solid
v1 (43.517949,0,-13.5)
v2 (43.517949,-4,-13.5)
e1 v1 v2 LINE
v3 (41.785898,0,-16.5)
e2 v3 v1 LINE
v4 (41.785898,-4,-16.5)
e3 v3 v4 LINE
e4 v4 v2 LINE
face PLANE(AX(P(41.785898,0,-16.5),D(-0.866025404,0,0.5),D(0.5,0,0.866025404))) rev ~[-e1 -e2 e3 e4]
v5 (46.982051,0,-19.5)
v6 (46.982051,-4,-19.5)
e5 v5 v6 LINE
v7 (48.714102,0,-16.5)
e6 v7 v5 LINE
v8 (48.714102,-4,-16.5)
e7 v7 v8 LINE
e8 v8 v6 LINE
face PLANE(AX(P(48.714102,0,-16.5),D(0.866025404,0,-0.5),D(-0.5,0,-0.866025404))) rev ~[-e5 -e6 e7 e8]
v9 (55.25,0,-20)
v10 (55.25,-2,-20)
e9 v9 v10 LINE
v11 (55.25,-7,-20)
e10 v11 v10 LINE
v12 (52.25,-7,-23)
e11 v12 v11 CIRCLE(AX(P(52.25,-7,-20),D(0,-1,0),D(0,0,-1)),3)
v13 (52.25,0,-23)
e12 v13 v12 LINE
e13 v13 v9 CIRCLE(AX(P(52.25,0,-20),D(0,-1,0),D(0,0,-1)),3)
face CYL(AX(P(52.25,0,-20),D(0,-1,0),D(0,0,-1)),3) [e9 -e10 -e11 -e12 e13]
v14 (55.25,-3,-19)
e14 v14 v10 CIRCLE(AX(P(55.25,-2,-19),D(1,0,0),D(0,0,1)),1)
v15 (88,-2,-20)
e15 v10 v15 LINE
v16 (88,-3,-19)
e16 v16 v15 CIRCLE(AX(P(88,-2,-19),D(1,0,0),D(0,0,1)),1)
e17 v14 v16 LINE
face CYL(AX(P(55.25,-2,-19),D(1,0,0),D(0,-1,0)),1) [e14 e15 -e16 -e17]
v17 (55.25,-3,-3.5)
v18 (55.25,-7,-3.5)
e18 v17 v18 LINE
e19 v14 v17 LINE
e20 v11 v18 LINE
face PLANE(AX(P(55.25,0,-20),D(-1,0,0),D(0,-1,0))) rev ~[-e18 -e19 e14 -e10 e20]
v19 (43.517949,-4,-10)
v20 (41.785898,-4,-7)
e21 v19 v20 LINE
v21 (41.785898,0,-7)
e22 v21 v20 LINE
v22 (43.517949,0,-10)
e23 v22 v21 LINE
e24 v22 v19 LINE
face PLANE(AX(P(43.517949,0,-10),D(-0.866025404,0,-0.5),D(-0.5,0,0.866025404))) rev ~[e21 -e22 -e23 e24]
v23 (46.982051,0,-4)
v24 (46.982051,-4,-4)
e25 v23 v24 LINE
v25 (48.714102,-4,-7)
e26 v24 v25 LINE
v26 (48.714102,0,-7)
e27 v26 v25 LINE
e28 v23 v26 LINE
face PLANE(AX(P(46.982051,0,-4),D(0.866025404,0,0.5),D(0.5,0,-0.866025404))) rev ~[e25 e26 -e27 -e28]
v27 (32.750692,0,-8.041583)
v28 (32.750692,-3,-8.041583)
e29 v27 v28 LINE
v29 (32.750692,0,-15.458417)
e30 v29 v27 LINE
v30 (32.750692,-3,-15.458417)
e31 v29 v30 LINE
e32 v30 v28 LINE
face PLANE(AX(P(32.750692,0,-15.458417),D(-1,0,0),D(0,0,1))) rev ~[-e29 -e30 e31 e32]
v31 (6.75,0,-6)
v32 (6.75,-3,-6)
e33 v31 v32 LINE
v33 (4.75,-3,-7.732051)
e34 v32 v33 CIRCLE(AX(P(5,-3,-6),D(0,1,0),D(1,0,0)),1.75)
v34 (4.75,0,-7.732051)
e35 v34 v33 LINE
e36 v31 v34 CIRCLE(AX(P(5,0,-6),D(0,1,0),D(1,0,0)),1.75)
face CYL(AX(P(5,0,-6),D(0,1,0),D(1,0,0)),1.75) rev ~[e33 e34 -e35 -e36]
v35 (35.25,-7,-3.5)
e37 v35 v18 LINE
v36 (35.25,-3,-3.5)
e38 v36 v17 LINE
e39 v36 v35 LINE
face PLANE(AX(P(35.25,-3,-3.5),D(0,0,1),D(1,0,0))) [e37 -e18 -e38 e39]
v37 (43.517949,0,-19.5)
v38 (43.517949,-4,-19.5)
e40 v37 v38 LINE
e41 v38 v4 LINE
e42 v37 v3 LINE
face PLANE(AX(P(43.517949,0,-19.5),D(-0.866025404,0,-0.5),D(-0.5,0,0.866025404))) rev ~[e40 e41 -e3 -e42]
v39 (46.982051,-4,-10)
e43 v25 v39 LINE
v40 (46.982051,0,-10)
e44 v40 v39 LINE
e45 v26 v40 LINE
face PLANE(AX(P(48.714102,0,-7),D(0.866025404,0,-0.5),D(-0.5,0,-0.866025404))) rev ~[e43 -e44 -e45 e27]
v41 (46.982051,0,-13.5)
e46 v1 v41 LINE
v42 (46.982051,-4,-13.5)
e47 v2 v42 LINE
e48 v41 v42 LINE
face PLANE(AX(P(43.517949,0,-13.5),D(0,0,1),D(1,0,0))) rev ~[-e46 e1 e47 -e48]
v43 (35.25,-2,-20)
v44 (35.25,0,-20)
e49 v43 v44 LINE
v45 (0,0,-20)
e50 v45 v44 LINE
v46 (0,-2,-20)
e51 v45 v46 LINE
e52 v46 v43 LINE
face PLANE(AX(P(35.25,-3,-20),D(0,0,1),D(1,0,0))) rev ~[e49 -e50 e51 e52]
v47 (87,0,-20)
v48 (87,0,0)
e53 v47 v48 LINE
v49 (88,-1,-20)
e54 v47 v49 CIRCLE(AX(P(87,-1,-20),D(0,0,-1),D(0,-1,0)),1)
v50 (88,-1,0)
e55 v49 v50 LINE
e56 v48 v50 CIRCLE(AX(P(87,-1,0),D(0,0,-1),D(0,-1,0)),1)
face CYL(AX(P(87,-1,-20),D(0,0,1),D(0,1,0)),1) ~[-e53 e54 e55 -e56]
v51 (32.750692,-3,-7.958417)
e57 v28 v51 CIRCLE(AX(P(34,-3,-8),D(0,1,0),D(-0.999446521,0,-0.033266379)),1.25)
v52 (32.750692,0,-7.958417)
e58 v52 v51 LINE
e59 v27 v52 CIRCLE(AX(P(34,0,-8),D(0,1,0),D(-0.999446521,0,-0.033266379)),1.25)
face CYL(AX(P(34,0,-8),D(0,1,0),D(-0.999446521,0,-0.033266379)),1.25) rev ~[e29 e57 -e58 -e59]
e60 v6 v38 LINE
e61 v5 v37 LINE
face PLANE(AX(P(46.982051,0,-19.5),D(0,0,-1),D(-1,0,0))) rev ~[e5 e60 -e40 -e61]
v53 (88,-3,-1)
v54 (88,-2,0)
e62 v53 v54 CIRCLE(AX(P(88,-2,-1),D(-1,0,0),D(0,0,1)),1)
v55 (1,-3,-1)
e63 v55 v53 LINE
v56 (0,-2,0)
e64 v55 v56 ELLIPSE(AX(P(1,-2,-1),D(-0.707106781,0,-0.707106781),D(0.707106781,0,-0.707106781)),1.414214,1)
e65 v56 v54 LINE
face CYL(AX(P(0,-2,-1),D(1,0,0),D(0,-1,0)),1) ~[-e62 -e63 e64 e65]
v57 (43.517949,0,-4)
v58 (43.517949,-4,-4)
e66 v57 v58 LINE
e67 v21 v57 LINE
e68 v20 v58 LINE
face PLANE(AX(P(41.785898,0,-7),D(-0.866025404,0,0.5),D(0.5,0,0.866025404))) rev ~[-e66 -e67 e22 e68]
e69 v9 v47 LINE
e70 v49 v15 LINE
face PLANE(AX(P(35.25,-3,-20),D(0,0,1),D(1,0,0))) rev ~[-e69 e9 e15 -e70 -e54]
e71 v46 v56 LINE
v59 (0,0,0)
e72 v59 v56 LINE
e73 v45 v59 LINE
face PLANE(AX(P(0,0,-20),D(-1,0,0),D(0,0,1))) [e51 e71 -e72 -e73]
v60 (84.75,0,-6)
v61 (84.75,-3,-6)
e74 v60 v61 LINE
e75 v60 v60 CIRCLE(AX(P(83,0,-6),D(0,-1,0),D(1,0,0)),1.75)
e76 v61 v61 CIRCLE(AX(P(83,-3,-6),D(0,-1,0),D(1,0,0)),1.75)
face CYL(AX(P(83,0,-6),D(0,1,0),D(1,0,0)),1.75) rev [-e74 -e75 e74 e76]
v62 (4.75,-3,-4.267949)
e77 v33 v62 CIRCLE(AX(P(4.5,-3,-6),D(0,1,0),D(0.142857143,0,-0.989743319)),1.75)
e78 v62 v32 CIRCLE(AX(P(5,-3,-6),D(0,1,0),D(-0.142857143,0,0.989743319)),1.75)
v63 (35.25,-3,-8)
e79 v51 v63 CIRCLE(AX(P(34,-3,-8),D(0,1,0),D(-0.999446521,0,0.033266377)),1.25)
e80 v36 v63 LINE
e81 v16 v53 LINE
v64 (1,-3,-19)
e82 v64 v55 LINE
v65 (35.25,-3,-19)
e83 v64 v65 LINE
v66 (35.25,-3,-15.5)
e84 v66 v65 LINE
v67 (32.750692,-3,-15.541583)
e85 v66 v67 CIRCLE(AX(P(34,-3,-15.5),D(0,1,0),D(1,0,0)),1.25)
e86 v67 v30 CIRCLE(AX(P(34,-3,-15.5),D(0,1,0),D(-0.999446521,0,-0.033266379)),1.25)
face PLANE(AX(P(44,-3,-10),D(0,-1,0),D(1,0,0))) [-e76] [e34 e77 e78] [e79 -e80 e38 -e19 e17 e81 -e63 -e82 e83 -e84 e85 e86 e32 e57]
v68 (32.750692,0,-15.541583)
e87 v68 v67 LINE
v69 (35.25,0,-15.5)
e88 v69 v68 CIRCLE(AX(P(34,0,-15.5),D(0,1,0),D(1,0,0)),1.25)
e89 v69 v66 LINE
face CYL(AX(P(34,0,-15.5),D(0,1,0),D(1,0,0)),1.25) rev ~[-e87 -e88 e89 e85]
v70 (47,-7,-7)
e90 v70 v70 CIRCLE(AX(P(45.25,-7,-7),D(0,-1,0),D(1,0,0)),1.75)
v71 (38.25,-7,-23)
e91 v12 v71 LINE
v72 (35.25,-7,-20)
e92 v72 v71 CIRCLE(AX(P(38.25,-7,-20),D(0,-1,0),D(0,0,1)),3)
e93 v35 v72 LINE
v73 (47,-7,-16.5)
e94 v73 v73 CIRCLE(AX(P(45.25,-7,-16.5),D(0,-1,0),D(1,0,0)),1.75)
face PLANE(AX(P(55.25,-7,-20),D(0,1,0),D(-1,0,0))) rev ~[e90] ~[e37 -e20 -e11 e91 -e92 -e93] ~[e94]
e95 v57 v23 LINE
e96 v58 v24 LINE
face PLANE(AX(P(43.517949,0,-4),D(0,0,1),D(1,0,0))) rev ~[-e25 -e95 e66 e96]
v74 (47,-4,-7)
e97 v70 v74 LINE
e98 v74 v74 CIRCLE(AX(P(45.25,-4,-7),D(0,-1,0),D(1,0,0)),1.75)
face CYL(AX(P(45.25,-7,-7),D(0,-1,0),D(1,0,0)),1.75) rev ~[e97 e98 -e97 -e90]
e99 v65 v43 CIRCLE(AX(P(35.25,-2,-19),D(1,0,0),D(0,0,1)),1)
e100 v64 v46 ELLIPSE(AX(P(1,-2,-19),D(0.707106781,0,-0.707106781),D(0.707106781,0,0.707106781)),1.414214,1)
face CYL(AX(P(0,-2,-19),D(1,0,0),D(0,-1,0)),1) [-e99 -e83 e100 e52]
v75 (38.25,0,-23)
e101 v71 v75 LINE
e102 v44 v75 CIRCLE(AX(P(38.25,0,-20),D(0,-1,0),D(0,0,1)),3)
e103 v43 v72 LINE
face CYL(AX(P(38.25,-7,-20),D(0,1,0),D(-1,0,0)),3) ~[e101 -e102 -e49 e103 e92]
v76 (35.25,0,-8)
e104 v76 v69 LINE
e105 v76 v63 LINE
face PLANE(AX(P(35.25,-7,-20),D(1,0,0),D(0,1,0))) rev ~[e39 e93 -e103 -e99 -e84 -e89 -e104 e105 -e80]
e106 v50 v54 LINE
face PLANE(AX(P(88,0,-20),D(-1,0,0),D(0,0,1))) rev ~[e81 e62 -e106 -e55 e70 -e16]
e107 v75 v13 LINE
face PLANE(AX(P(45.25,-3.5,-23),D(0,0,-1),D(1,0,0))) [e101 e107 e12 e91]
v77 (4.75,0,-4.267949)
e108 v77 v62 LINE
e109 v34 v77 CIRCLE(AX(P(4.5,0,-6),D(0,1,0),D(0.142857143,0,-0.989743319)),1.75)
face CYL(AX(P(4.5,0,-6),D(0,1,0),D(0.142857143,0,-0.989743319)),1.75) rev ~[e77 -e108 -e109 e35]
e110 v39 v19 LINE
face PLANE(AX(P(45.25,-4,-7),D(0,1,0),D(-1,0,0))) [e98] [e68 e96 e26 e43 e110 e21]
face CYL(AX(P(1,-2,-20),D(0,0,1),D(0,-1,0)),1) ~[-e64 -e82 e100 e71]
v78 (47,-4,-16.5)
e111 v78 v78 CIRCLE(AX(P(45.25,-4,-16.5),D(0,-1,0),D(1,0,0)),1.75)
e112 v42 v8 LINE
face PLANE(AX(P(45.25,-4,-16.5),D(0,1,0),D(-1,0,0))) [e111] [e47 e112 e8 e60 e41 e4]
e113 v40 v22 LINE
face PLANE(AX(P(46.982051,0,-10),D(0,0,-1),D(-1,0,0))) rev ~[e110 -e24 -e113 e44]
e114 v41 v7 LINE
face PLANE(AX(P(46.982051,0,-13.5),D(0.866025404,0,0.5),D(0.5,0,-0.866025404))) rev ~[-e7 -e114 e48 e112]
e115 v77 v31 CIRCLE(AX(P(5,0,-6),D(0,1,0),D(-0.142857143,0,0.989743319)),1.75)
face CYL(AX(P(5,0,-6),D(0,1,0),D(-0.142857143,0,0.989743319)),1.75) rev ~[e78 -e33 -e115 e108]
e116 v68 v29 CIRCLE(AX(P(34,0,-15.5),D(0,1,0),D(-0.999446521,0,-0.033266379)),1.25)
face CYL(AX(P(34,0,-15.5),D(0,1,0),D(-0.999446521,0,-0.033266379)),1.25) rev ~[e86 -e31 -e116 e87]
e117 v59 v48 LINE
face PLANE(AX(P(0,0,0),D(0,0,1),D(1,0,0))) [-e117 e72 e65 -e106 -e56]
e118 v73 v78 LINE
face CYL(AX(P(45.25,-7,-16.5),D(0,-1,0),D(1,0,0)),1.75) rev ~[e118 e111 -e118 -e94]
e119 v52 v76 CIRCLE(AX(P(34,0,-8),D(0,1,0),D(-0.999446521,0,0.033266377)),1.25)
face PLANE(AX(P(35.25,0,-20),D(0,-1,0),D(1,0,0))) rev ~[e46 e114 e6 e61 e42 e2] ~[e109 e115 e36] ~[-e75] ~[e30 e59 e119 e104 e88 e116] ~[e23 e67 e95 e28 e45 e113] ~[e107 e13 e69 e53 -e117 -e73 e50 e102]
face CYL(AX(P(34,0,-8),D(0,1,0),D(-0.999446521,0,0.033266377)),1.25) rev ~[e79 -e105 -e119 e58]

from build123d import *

# Parameters (mm, degrees)
F0_W     = 88
F0_H     = 20
F0_R     = 1.75
F1_DEPTH = 3
F2_W     = 20
F2_H     = 4.5
F2_H_2   = 7.5
F3_DEPTH = 4
F6_DEPTH = 4
F4_R     = 1.75
F7_DEPTH = 25
F9_DEPTH = 3
F10_R    = 3
F11_R    = 1


# Not quite as in the source:
# - a feature names something its author has since deleted; it is built from what else it names


with BuildPart() as f1:
    # F0 (on Front) → F1 (new body)
    with BuildSketch(Plane.XZ):
        with Locations((44, -10)):
            Rectangle(F0_W, F0_H)
        with BuildLine():
            ThreePointArc((35.25, -15.5), (34.0207943633, -16.7498270258), (32.7506918489, -15.5415829716))
            ThreePointArc((32.7506918489, -15.5415829716), (32.75, -15.5), (32.7506918489, -15.4584170284))
            Line((32.7506918489, -15.4584170284), (32.7506918489, -8.0415829716))
            ThreePointArc((32.7506918489, -8.0415829716), (32.75, -8), (32.7506918489, -7.9584170284))
            ThreePointArc((32.7506918489, -7.9584170284), (34.0207943633, -6.7501729742), (35.25, -8))
            Line((35.25, -8), (35.25, -15.5))
        make_face(mode=Mode.SUBTRACT)
        with BuildLine():
            ThreePointArc((4.75, -4.2679491924), (6.1456439237, -4.6771243445), (6.75, -6))
            ThreePointArc((6.75, -6), (6.1456439237, -7.3228756555), (4.75, -7.7320508076))
            ThreePointArc((4.75, -7.7320508076), (2.75, -6), (4.75, -4.2679491924))
        make_face(mode=Mode.SUBTRACT)
        with Locations((83, -6)):
            Circle(F0_R, mode=Mode.SUBTRACT)
    extrude(amount=F1_DEPTH)

    # F2 (on face) → F3 (join)
    with BuildSketch(Plane.XZ.offset(3)):
        with Locations((45.25, -5.75)):
            Rectangle(F2_W, F2_H)
        with Locations((45.25, -11.75)):
            Rectangle(F2_W, F2_H_2)
        with Locations((45.25, -17.75)):
            Rectangle(F2_W, F2_H)
    extrude(amount=F3_DEPTH)

    # F5 (on face) → F6 (cut)
    with BuildSketch(Plane(origin=(0, 0, 0), x_dir=(-1, 0, 0), z_dir=(0, 1, 0))):
        Polygon((-43.5179491924, -4), (-46.9820508076, -4), (-48.7141016151, -7), (-46.9820508076, -10), (-43.5179491924, -10), (-41.7858983849, -7), align=None)
        Polygon((-43.5179491924, -13.5), (-46.9820508076, -13.5), (-48.7141016151, -16.5), (-46.9820508076, -19.5), (-43.5179491924, -19.5), (-41.7858983849, -16.5), align=None)
    extrude(amount=-F6_DEPTH, mode=Mode.SUBTRACT)

    # F4 (on face) → F7 (cut)
    with BuildSketch(Plane.XZ.offset(7)):
        with Locations((45.25, -7)):
            Circle(F4_R)
        with Locations((45.25, -16.5)):
            Circle(F4_R)
    extrude(amount=-F7_DEPTH, mode=Mode.SUBTRACT)

    # F8 (on face) → F9 (join)
    with BuildSketch(Plane(origin=(0, 0, -20), x_dir=(1, 0, 0), z_dir=(0, 0, -1))):
        Polygon((55.25, 3), (55.25, 7), (35.25, 7), (35.25, 3), (35.25, 0), (55.25, 0), align=None)
    extrude(amount=F9_DEPTH)

    # F10
    f10_edges = [f1.edges().sort_by_distance(p)[0] for p in [
        (35.25, -3.5, -23),
        (55.25, -3.5, -23),
    ]]
    fillet(f10_edges, radius=F10_R)

    # F11
    f11_edges = [f1.edges().sort_by_distance(p)[0] for p in [
        (44, -3, 0),
        (88, 0, -10),
        (71.625, -3, -20),
        (17.625, -3, -20),
        (0, -3, -10),
    ]]
    fillet(f11_edges, radius=F11_R)


solid = f1.part
